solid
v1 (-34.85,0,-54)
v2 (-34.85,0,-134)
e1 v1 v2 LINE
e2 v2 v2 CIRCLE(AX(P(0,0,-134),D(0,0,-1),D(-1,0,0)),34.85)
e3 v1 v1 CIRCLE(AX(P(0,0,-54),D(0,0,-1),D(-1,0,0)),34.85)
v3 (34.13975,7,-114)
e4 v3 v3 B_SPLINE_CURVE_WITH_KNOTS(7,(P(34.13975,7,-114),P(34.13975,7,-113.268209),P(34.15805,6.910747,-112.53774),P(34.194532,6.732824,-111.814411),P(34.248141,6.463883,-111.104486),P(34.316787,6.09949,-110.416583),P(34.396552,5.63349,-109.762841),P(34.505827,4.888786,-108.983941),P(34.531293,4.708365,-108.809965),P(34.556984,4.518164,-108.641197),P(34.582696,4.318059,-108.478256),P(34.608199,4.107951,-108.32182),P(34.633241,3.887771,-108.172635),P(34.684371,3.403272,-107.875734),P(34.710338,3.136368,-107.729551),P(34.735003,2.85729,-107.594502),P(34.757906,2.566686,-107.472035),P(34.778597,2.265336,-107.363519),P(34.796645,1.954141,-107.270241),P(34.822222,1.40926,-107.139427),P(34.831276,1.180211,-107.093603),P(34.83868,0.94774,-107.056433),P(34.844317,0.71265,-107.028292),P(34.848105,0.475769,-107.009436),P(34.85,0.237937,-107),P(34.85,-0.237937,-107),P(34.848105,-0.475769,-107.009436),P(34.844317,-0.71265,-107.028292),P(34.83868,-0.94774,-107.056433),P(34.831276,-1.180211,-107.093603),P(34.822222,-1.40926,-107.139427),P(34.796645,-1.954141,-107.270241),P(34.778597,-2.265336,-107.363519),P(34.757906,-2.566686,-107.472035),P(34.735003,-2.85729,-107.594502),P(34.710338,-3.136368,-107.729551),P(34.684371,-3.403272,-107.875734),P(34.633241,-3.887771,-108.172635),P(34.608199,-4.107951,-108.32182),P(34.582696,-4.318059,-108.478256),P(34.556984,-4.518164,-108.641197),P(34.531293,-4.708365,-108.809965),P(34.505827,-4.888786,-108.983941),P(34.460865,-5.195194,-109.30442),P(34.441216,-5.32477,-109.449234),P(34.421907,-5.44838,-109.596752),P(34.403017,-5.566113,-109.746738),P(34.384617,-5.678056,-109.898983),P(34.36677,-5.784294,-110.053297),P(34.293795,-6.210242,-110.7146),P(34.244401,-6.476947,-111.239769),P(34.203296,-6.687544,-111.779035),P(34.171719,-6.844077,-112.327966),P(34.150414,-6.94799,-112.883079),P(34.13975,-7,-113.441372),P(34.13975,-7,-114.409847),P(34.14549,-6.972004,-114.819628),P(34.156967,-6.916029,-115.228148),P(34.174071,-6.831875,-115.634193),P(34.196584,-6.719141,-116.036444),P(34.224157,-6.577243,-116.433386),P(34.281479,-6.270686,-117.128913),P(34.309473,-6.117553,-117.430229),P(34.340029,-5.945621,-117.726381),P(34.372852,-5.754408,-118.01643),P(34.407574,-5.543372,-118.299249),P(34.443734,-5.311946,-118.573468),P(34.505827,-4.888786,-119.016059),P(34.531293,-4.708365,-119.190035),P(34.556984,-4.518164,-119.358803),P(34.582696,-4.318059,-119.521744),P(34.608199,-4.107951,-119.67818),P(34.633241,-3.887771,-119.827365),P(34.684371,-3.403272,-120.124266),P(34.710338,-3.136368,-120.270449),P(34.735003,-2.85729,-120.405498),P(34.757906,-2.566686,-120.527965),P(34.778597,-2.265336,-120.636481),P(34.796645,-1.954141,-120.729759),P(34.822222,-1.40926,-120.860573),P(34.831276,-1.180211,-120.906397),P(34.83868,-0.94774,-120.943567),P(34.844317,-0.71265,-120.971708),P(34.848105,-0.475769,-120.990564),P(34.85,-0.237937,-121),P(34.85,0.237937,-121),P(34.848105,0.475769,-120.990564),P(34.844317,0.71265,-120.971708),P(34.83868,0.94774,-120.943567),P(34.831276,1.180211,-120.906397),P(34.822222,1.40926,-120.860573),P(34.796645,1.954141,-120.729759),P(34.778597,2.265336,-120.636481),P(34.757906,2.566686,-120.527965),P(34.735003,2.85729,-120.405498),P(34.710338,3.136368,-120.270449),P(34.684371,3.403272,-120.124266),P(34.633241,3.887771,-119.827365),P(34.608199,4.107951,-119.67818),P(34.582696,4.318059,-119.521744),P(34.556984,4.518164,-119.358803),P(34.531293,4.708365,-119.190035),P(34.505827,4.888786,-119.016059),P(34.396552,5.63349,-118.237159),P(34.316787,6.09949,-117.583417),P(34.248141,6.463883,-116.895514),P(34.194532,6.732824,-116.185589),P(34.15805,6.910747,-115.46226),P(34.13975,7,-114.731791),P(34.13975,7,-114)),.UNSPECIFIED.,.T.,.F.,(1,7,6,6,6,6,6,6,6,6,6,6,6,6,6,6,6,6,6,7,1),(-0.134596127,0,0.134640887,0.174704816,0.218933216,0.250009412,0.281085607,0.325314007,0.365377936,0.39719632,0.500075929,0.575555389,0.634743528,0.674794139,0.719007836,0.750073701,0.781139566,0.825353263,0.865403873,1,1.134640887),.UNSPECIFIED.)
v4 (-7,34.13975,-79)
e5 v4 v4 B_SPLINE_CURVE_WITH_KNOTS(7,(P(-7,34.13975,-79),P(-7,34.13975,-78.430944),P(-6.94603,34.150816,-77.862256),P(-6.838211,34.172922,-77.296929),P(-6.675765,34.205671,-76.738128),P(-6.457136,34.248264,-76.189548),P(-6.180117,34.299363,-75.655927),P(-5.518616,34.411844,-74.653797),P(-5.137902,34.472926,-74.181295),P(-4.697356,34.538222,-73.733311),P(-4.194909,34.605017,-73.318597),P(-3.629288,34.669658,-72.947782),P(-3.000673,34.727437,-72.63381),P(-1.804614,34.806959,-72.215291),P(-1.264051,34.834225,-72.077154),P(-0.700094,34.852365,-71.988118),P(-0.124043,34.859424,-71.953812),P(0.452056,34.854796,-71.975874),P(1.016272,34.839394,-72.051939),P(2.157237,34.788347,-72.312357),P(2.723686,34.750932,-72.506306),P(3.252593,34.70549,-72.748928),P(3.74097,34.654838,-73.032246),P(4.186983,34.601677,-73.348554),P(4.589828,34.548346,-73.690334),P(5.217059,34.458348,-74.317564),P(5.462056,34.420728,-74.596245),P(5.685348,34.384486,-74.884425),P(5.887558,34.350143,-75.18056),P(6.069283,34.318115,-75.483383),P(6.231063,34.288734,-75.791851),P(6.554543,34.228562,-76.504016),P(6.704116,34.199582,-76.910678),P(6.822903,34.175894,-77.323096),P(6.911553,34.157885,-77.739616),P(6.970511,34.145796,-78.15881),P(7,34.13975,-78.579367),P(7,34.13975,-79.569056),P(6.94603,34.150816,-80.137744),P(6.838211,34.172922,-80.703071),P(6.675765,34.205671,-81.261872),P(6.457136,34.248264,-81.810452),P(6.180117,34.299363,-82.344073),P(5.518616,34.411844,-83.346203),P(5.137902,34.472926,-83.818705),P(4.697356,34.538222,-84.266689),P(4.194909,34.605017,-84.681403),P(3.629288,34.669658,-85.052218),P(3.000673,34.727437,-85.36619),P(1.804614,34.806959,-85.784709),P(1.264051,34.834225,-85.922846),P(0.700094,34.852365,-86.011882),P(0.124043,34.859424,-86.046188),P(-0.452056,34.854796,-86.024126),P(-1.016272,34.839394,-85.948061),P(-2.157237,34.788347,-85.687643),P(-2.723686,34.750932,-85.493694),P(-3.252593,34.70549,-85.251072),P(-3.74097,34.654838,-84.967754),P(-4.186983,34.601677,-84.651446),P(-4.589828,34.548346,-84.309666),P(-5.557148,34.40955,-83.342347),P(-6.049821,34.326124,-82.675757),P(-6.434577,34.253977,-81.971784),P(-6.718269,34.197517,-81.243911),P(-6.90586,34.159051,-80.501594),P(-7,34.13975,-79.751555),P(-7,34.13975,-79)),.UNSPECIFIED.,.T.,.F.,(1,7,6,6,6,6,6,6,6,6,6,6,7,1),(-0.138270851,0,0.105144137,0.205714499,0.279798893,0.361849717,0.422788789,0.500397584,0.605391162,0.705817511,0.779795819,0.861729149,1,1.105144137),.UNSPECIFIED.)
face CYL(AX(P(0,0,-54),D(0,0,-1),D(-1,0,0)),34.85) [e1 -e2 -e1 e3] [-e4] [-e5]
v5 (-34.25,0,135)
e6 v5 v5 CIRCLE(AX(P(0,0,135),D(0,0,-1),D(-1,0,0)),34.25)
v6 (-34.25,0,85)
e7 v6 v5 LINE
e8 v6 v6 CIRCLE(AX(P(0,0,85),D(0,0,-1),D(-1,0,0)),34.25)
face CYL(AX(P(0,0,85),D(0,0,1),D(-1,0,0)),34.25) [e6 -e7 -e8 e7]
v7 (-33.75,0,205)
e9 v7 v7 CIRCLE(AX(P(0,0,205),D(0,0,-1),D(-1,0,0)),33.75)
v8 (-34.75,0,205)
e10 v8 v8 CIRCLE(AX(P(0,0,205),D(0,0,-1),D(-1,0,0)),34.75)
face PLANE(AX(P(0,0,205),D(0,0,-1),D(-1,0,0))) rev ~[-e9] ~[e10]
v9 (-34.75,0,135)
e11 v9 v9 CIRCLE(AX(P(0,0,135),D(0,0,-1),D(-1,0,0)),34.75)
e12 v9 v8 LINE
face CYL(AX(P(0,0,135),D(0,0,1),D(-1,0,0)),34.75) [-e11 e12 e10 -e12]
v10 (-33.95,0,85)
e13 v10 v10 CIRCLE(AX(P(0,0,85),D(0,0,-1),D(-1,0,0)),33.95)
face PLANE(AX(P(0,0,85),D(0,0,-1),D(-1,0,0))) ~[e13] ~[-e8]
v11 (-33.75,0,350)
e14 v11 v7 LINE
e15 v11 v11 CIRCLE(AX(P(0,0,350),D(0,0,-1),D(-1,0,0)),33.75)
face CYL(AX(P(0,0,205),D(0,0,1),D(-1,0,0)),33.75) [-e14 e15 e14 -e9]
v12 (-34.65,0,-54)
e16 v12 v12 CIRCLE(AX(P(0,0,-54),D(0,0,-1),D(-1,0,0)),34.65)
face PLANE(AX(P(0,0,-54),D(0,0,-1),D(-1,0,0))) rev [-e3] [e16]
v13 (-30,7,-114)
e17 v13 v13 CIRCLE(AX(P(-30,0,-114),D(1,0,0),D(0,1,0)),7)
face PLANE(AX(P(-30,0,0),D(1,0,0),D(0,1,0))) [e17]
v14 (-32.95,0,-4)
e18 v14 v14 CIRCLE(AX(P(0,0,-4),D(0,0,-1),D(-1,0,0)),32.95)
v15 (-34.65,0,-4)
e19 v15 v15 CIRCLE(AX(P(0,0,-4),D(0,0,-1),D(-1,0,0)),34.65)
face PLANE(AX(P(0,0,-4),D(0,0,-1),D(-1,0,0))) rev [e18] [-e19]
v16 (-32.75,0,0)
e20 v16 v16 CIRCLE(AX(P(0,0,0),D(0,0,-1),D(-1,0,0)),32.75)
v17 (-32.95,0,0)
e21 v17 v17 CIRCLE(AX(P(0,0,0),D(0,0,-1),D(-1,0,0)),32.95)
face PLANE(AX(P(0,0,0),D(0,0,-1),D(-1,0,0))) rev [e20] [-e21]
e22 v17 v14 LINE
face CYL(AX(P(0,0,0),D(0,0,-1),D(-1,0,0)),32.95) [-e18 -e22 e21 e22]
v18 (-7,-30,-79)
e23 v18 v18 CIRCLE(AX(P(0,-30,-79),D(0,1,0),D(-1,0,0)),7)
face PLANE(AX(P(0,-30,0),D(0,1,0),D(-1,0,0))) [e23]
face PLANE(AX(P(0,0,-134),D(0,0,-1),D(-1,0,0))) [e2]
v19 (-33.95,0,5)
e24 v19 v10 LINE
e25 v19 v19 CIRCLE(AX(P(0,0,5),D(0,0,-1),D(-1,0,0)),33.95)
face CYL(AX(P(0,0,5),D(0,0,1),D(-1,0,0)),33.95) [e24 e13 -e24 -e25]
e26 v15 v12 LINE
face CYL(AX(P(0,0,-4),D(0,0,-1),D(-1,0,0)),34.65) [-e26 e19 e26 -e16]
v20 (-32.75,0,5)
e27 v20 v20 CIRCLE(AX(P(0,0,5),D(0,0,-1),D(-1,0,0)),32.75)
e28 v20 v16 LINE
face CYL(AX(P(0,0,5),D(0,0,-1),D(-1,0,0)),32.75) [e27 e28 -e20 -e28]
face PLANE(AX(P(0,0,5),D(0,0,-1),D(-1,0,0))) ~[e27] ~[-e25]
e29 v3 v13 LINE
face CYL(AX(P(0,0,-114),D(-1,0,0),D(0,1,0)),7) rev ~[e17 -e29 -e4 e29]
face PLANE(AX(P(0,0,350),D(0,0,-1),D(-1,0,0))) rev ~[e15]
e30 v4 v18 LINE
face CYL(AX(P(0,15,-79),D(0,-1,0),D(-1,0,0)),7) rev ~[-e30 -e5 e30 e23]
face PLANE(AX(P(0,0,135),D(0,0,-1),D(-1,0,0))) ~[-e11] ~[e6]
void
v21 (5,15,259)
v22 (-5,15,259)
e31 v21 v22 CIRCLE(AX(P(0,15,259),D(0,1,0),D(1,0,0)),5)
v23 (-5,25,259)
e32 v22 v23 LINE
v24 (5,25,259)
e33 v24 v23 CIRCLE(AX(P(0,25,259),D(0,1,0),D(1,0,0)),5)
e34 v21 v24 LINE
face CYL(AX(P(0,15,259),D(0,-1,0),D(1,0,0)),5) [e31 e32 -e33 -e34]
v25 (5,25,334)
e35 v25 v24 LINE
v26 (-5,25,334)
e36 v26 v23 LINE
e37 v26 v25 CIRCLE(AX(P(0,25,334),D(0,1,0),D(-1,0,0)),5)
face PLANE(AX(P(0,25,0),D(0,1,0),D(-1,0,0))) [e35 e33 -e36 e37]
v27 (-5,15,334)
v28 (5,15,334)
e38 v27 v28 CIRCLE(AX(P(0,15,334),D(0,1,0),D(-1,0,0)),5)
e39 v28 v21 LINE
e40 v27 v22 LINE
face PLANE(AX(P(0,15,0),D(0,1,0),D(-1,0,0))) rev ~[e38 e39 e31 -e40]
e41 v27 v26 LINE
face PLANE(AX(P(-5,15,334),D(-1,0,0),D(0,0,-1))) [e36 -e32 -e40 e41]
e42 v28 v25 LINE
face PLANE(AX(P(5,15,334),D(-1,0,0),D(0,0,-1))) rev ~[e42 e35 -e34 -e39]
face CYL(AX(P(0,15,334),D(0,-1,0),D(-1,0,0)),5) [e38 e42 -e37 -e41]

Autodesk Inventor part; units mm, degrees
ref_plane "YZ Plane" through (0, 0, 0) normal (1, 0, 0) x (0, 1, 0)
ref_plane "XY Plane" through (0, 0, 0) normal (0, 0, 1) x (1, 0, 0)
sketch "Sketch1" plane through (0, 0, 0) normal (0, 1, 0) x (-1, 0, 0)
  line L0 (32.75, 5) -> (33.95, 5)
  line L1 (33.95, 5) -> (33.95, 85)
  line L2 (33.95, 85) -> (34.25, 85)
  line L3 (34.25, 85) -> (34.25, 135)
  line L4 (34.25, 135) -> (34.75, 135)
  line L5 (34.75, 135) -> (34.75, 205)
  line L6 (34.75, 205) -> (33.75, 205)
  line L7 (33.75, 205) -> (33.75, 245)
  line L8 (33.75, 245) -> (33.75, 245)
  line L9 (33.75, 245) -> (33.75, 350)
  line L10 (33.75, 350) -> (0, 350)
  line L11 (0, 189.8856) -> (0, -122.7414) construction
  line L12 (32.75, 5) -> (32.75, 0)
  line L13 (0, 350) -> (0, 0)
  line L14 (32.75, 0) -> (32.95, 0)
  line L15 (32.95, 0) -> (32.95, -4)
  line L16 (32.95, -4) -> (34.65, -4)
  line L17 (34.65, -4) -> (34.65, -54)
  line L18 (34.65, -54) -> (34.85, -54)
  line L19 (34.85, -54) -> (34.85, -134)
  line L20 (34.85, -134) -> (0, -134)
  line L21 (0, 0) -> (0, -134)
  line L22 (32.75, 0) -> (32.95, 0)
  dimension "d0" = 105
  dimension "d3" = 70
  dimension "d2" = 80
  dimension "d4" = 5
  dimension "d15" = 40
  dimension "d16" = 50
  dimension "d69" = 33.75
  dimension "d70" = 34.75
  dimension "d71" = 33.95
  dimension "d78" = 32.75
  dimension "d82" = 4
  dimension "d83" = 50
  dimension "d84" = 32.95
  dimension "d85" = 34.85
  dimension "d86" = 80
  dimension "d87" = 33.75
  dimension "d88" = 34.25
  dimension "d89" = 34.65
ref_plane "Work Plane1" through (0, 15, 0) normal (0, 1, 0) x (-1, 0, 0)
sketch "Sketch2" plane through (0, 15, 0) normal (0, 1, 0) x (-1, 0, 0)
  arc A0 (-5, 259) -> (5, 259) centre (0, 259) ccw
  arc A1 (5, 334) -> (-5, 334) centre (0, 334) ccw
  line L0 (-5, 334) -> (-5, 259)
  line L1 (5, 334) -> (5, 259)
  line L2 (0, 0) -> (0, 401.4271) construction
  dimension "d18" = 10
  dimension "d19" = 10
  dimension "d65" = 259
  dimension "d68" = 75
sketch "Sketch3" plane through (0, 15, 0) normal (0, 1, 0) x (-1, 0, 0)
  circle A0 centre (0, -79) radius 7
  point P0 (0, 0)
  dimension "d22" = 14
  dimension "d66" = 79
sketch "Sketch4" plane through (0, 0, 0) normal (1, 0, 0) x (0, 1, 0)
  circle A0 centre (0, -114) radius 7
  point P0 (0, 0)
  dimension "d28" = 14
  dimension "d67" = 114
revolve "Revolution1" add sketch "Sketch1" angle 360 about axis through (0, 0, 350) along (0, 0, -1)
extrude "Extrusion4" cut sketch "Sketch2" along normal blind 10
extrude "Extrusion5" cut sketch "Sketch3" along normal blind 20 and the other way blind 45
extrude "Extrusion6" cut sketch "Sketch4" along normal blind 35 and the other way blind 30
sketch "Sketch5" plane through (0, 0, 0) normal (0, 1, 0) x (-1, 0, 0)
  line L0 (32.75, 5) -> (32.75, 0) projected
  point P0 (0, 0)
sketch "Sketch6" plane through (0, 0, 0) normal (1, 0, 0) x (0, 1, 0)
  line L0 (0, 0) -> (-46.2751, 0) construction
equation "\"espesor_testero\" = 4"
equation "\"espesor_brida\" = 5"
properties part number "Mangon_Conduccion"
